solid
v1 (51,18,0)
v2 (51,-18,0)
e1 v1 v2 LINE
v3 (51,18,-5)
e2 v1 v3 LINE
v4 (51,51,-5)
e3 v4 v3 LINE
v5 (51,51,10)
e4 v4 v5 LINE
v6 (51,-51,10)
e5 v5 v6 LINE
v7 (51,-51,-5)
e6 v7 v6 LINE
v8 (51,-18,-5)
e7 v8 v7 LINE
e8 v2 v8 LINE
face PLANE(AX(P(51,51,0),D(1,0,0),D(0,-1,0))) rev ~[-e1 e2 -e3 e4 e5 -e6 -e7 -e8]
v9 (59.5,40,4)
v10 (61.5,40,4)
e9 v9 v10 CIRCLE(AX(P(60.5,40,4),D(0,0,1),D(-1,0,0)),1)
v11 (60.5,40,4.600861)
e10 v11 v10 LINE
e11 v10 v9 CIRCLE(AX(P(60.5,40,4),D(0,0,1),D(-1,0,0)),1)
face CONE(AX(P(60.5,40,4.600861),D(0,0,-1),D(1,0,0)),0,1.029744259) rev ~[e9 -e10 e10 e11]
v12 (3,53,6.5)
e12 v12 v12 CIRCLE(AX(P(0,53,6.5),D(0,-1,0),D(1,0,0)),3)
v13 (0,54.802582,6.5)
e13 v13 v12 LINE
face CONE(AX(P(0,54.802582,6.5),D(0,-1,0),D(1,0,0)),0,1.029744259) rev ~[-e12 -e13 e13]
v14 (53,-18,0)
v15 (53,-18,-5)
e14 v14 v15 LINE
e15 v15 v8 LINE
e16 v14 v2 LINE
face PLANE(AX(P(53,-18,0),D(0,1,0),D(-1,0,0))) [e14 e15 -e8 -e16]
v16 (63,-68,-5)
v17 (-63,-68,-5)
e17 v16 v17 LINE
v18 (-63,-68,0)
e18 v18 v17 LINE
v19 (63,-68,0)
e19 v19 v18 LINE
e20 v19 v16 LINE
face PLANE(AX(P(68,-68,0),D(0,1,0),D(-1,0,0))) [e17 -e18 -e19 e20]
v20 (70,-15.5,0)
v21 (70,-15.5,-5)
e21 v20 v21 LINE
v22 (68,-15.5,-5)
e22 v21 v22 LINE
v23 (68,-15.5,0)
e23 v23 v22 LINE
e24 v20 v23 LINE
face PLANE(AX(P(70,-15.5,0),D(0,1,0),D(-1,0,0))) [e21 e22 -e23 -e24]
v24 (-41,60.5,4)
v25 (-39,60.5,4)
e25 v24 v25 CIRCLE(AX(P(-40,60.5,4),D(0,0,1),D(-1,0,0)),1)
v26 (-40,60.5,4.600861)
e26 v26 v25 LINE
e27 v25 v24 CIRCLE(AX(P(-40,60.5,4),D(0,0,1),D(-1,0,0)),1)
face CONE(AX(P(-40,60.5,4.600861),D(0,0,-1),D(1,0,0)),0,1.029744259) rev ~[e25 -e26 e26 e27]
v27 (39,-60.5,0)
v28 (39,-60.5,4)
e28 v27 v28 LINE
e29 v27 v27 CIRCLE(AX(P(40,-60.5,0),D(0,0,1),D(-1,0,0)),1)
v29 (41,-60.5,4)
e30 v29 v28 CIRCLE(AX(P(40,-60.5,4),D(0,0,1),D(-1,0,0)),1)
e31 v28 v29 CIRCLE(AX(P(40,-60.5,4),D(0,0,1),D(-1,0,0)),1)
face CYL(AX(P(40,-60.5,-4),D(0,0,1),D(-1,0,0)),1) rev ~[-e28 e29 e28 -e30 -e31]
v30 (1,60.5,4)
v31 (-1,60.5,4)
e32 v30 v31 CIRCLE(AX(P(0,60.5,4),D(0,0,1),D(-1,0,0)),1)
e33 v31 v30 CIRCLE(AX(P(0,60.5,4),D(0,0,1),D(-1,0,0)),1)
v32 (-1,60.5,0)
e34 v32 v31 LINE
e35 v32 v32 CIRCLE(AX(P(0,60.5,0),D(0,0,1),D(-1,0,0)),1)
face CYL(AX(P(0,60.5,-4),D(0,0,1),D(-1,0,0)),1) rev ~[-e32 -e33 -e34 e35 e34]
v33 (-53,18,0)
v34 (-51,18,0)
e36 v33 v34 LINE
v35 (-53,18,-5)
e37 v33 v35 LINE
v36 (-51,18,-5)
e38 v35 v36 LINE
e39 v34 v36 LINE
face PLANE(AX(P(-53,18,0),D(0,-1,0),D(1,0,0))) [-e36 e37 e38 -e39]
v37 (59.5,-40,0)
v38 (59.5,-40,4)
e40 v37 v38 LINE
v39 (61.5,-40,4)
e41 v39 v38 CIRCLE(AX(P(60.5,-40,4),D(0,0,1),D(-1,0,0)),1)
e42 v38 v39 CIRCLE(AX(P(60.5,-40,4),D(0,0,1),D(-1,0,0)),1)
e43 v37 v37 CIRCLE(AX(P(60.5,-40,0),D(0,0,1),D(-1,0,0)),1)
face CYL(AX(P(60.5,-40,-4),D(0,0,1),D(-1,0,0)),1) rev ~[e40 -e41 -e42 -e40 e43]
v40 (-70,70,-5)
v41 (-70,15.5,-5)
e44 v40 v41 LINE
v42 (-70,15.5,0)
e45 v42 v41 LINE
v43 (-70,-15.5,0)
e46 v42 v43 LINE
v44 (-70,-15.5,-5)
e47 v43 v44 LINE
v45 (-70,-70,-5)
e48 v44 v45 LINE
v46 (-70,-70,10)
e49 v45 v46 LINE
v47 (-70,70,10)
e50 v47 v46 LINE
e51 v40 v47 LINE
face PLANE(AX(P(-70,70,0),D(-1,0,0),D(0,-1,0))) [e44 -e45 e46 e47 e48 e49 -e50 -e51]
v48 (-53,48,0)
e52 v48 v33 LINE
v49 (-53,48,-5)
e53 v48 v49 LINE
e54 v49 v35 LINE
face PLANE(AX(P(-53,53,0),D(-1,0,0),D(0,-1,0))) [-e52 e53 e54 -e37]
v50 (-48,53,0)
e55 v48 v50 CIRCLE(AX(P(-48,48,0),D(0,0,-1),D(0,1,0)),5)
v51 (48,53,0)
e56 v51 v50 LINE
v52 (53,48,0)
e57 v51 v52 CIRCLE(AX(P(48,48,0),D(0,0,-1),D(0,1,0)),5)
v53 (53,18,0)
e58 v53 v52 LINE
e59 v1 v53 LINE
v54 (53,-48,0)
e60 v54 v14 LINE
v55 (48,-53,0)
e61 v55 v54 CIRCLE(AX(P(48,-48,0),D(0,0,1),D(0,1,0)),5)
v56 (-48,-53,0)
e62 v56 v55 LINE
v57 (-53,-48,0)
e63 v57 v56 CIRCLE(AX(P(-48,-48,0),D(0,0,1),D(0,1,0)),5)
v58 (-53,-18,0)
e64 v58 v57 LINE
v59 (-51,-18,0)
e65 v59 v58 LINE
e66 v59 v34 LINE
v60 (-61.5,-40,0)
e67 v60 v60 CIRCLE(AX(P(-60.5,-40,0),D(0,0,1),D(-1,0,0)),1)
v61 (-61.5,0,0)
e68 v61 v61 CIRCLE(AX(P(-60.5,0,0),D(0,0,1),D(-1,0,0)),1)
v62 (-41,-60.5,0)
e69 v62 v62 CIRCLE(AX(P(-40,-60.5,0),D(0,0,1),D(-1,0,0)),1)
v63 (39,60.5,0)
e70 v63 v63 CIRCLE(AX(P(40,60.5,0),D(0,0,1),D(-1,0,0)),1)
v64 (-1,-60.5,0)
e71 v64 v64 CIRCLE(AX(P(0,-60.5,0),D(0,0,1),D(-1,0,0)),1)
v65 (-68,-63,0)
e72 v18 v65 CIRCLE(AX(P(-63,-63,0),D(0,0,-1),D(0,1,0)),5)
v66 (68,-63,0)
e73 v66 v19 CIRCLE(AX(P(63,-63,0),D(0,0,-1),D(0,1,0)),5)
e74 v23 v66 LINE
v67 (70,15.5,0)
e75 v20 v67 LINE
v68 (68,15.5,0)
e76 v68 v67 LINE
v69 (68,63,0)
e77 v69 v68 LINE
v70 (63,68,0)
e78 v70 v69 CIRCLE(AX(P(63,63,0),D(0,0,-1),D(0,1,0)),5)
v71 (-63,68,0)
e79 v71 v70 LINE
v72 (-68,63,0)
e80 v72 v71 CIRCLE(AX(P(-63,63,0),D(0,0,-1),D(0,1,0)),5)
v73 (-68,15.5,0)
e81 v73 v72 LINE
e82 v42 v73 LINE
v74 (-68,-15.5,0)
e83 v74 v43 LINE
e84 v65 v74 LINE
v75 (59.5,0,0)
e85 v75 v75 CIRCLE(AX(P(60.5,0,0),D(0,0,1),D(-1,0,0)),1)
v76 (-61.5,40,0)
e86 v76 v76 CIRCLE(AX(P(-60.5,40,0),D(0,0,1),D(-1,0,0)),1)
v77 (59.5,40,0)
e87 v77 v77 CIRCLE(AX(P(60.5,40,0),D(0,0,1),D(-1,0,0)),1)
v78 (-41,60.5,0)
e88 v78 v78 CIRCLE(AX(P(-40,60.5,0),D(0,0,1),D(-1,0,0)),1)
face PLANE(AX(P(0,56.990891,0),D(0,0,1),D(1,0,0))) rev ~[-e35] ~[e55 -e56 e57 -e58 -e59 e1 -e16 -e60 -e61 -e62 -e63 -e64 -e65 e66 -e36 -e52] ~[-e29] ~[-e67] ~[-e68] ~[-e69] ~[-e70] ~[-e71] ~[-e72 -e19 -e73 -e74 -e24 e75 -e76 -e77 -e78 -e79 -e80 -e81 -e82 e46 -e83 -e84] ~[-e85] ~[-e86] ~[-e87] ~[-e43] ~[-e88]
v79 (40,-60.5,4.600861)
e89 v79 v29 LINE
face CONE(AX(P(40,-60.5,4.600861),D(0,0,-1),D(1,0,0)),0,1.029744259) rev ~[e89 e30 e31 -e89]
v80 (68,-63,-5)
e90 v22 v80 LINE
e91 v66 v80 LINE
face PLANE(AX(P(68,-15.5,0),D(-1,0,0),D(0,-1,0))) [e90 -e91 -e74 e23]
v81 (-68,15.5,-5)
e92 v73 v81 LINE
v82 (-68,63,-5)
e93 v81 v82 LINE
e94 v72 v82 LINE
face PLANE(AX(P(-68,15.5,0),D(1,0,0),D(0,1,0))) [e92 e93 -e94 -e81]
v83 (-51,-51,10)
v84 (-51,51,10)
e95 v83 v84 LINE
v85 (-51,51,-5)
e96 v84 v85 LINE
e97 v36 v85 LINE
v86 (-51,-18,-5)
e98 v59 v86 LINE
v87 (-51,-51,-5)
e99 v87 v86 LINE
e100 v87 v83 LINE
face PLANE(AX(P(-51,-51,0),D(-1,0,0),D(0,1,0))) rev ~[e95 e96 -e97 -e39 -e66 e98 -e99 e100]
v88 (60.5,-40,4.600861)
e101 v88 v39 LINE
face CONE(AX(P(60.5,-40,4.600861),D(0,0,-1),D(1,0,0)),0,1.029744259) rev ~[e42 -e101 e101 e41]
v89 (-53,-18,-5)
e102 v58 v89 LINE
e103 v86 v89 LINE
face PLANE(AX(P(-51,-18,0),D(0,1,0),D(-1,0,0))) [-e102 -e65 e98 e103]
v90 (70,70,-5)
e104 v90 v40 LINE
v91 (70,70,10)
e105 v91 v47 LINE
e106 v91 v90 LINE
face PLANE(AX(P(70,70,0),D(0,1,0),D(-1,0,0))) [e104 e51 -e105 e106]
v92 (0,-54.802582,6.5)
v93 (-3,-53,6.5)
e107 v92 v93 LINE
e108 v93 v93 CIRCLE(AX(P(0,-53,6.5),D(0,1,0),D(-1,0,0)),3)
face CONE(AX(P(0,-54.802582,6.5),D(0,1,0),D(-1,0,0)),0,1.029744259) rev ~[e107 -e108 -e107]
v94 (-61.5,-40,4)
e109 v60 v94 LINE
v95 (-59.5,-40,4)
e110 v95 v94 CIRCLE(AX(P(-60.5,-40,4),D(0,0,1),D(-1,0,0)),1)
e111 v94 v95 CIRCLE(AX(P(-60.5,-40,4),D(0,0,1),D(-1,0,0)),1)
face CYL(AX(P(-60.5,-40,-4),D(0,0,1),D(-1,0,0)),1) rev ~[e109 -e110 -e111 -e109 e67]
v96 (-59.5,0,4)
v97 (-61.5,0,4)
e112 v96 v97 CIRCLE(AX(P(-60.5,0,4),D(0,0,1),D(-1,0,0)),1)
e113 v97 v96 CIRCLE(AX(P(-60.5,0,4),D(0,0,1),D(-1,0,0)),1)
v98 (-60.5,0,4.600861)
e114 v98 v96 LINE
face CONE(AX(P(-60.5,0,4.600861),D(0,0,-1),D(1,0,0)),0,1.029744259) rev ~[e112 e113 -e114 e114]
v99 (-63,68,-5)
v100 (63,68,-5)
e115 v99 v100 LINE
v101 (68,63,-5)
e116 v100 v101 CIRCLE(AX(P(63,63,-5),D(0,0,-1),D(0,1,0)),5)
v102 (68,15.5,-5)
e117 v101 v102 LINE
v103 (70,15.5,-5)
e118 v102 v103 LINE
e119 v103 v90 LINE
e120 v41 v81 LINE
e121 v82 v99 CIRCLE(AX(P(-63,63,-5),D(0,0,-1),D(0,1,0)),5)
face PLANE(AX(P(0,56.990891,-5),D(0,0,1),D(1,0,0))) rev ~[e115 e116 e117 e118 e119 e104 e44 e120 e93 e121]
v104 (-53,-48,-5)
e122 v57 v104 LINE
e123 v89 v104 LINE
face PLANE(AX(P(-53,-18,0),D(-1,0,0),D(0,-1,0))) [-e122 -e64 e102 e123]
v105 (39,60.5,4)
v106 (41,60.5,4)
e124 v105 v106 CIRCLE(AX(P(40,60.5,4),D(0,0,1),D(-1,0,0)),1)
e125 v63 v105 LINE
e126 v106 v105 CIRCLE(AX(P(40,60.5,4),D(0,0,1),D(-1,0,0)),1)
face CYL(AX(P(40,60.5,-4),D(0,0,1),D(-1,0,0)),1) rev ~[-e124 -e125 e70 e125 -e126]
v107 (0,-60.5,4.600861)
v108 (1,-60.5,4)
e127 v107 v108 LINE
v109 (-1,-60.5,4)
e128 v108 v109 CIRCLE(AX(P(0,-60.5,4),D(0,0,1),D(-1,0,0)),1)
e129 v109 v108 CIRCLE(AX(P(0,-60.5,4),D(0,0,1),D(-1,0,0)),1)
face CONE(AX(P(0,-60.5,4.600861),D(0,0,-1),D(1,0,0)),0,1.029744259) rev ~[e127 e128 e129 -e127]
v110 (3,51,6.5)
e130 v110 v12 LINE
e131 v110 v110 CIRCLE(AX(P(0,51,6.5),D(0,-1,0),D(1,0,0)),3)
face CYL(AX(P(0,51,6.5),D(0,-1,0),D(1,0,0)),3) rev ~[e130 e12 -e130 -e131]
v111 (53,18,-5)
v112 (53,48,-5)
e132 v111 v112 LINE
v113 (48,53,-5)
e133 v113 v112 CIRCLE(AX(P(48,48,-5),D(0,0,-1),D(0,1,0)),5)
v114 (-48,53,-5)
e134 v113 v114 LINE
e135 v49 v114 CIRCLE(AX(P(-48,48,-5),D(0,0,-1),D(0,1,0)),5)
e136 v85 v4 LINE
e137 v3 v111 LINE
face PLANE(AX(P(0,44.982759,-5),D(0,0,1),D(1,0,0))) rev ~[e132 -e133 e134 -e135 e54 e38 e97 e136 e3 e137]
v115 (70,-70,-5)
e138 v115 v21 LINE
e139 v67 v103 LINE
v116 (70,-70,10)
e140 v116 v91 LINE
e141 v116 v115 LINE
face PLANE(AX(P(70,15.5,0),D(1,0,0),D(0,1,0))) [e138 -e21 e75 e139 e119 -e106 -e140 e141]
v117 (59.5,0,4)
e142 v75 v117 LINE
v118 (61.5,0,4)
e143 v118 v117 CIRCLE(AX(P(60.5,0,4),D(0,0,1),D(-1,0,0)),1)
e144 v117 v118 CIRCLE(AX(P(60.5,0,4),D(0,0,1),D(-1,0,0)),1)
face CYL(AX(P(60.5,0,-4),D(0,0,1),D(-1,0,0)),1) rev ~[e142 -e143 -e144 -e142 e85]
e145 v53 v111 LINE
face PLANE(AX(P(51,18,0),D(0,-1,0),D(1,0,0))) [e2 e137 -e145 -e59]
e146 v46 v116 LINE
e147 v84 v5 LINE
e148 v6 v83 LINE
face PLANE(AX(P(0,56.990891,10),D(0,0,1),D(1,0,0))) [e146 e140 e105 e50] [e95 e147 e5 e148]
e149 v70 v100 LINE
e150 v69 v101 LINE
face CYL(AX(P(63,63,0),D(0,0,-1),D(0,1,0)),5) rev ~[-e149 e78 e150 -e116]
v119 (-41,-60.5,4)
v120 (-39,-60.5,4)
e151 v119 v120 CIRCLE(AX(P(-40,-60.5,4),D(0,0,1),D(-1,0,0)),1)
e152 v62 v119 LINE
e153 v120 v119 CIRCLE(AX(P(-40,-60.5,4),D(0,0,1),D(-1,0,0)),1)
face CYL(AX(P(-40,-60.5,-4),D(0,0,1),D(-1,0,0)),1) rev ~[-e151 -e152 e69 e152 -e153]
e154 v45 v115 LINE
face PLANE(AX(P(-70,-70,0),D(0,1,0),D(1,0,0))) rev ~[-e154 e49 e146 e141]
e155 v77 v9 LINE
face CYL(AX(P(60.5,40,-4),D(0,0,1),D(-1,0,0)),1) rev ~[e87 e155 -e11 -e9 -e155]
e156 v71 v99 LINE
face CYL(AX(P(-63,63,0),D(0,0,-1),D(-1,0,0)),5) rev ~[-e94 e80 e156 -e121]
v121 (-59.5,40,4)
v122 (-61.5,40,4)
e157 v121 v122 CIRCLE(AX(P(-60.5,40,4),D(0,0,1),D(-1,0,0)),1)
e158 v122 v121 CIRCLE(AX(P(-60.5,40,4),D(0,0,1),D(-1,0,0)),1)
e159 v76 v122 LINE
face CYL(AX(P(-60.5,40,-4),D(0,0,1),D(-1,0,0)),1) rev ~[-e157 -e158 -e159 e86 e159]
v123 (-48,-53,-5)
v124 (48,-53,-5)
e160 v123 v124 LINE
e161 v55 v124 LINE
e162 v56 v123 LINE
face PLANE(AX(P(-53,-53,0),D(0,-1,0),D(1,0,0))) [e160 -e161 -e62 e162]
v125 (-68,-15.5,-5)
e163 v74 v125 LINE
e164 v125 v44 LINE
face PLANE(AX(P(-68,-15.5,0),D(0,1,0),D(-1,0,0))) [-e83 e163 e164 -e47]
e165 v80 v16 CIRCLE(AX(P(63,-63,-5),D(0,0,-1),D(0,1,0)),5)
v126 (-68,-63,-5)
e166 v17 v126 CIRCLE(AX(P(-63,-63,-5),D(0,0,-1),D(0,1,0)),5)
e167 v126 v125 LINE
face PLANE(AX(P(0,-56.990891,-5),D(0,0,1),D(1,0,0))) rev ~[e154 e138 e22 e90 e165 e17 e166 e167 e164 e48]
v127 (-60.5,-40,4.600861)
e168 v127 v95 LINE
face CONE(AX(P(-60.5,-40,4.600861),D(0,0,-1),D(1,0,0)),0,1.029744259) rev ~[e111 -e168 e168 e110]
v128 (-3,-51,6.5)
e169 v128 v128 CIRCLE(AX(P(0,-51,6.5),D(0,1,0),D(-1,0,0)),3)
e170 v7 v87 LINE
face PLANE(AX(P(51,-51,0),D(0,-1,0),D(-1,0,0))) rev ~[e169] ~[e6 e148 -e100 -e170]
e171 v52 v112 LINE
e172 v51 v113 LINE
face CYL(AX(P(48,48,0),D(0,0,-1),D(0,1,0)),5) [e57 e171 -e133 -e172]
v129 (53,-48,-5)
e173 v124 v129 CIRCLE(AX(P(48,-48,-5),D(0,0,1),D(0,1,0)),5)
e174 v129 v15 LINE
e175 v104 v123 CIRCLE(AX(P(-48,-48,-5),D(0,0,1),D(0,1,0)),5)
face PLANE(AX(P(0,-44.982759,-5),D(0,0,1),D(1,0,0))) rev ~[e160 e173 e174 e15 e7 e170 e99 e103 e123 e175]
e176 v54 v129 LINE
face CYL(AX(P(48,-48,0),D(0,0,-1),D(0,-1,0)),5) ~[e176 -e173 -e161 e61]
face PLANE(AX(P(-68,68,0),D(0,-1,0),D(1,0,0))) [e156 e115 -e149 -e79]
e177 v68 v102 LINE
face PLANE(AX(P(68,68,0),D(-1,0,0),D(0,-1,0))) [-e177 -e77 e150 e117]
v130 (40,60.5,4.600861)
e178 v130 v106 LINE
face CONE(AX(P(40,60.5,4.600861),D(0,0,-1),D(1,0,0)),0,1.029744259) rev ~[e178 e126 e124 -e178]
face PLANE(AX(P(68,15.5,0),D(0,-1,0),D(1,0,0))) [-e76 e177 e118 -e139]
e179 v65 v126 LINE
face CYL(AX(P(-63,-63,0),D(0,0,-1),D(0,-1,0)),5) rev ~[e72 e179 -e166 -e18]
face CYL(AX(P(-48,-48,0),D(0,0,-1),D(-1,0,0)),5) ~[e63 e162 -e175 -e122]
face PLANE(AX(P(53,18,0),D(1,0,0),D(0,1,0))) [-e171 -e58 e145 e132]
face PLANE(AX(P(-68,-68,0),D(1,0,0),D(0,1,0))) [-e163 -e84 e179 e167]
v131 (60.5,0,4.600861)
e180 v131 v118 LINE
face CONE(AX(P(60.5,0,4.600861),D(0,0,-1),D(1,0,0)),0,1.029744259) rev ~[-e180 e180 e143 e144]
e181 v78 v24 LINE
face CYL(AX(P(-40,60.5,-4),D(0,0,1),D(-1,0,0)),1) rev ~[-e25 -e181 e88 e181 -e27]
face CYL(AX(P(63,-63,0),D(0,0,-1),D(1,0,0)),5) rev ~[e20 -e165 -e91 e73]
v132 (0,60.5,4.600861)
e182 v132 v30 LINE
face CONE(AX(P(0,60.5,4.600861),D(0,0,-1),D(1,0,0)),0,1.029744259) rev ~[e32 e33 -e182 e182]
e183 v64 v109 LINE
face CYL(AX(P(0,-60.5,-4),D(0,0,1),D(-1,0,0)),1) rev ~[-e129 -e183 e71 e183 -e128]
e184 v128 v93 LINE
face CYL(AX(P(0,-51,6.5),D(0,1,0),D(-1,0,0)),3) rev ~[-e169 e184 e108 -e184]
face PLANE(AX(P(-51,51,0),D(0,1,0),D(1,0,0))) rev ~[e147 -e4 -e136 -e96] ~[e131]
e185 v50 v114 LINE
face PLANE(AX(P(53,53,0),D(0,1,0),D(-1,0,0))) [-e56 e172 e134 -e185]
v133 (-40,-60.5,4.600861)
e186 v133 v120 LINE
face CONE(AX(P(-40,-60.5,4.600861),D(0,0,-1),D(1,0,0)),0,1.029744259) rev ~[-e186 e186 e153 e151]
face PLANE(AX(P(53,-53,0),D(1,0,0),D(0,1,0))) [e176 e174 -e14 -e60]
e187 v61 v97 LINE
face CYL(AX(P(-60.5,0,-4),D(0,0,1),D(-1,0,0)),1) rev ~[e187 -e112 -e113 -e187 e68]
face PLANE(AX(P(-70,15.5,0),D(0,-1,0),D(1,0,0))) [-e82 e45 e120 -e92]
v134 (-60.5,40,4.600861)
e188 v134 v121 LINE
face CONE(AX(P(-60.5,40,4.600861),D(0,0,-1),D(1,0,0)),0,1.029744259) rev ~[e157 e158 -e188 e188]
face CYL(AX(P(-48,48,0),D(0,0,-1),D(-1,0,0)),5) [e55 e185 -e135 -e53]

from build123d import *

# Parameters (mm, degrees)
F1_DEPTH = 10
F2_DEPTH = 5
F3_D     = 2
F3_DEPTH = 4
F3_TIP   = 0.600860619
F4_R     = 5
F6_D     = 6
F6_DEPTH = 2
F6_TIP   = 1.8025818571
F8_D     = 6
F8_DEPTH = 2
F8_TIP   = 1.8025818571


# Not quite as in the source:
# - a feature names something its author has since deleted; it is built from what else it names


with BuildPart() as f1:
    # F0 (on Top) → F1 (new body)
    with BuildSketch(Plane.XY):
        Polygon((70, 70), (-70, 70), (-70, 15.5), (-68, 15.5), (-68, 68), (68, 68), (68, 15.5), (70, 15.5), align=None)
        Polygon((-68, 68), (-68, 15.5), (-68, 0), (-68, -15.5), (-68, -68), (68, -68), (68, -15.5), (68, 0), (68, 15.5), (68, 68), align=None)
        Polygon((53, -18), (53, -53), (-53, -53), (-53, -18), (-53, 18), (-53, 53), (53, 53), (53, 18), (53, 0), align=None, mode=Mode.SUBTRACT)
        Polygon((-68, 15.5), (-70, 15.5), (-70, -15.5), (-68, -15.5), (-68, 0), align=None)
        Polygon((-68, -15.5), (-70, -15.5), (-70, -70), (70, -70), (70, -15.5), (68, -15.5), (68, -68), (-68, -68), align=None)
        Polygon((70, -15.5), (70, 15.5), (68, 15.5), (68, 0), (68, -15.5), align=None)
        Polygon((-53, 53), (-53, 18), (-51, 18), (-51, 51), (51, 51), (51, 18), (53, 18), (53, 53), align=None)
        Polygon((-53, 18), (-53, -18), (-51, -18), (-51, 0), (-51, 18), align=None)
        Polygon((51, -18), (53, -18), (53, 0), (53, 18), (51, 18), align=None)
        Polygon((-53, -53), (53, -53), (53, -18), (51, -18), (51, -51), (-51, -51), (-51, -18), (-53, -18), align=None)
    extrude(amount=F1_DEPTH)

    # F0 (on Top) → F2 (join)
    with BuildSketch(Plane.XY):
        Polygon((70, 70), (-70, 70), (-70, 15.5), (-68, 15.5), (-68, 68), (68, 68), (68, 15.5), (70, 15.5), align=None)
        Polygon((-68, -15.5), (-70, -15.5), (-70, -70), (70, -70), (70, -15.5), (68, -15.5), (68, -68), (-68, -68), align=None)
        Polygon((-53, -53), (53, -53), (53, -18), (51, -18), (51, -51), (-51, -51), (-51, -18), (-53, -18), align=None)
        Polygon((-53, 53), (-53, 18), (-51, 18), (-51, 51), (51, 51), (51, 18), (53, 18), (53, 53), align=None)
    extrude(amount=-F2_DEPTH)

    # F3
    with Locations(Plane(origin=(0, 0, 0), x_dir=(1, 0, 0), z_dir=(0, 0, -1))):
        with Locations((0, 60.5), (60.5, 0), (0, -60.5), (-60.5, 0), (-60.5, 40), (-40, 60.5), (40, 60.5), (60.5, 40), (60.5, -40), (40, -60.5), (-40, -60.5), (-60.5, -40)):
            Hole(F3_D / 2, depth=F3_DEPTH)
            with Locations((0, 0, -(F3_DEPTH + F3_TIP / 2))):  # 118° drill point
                Cone(0, F3_D / 2, F3_TIP, mode=Mode.SUBTRACT)

    # F4
    f4_edges = [f1.edges().sort_by_distance(p)[0] for p in [
        (-68, -68, -2.5),
        (-53, -53, -2.5),
        (-53, 53, -2.5),
        (53, 53, -2.5),
        (53, -53, -2.5),
        (68, 68, -2.5),
        (-68, 68, -2.5),
        (68, -68, -2.5),
    ]]
    fillet(f4_edges, radius=F4_R)

    # F6 (one way)
    with BuildSketch(Plane.XZ.offset(-51)):
        with Locations((0, 6.5)):
            Circle(F6_D / 2)
    extrude(amount=-F6_DEPTH, mode=Mode.SUBTRACT)
    with Locations(Plane.XZ.offset(-51)):
        with Locations((0, 6.5)):
            with Locations((0, 0, -(F6_DEPTH + F6_TIP / 2))):  # 118° drill point
                Cone(0, F6_D / 2, F6_TIP, mode=Mode.SUBTRACT)

    # F8 (one way)
    with BuildSketch(Plane(origin=(0, -51, 0), x_dir=(-1, 0, 0), z_dir=(0, 1, 0))):
        with Locations((0, 6.5)):
            Circle(F8_D / 2)
    extrude(amount=-F8_DEPTH, mode=Mode.SUBTRACT)
    with Locations(Plane(origin=(0, -51, 0), x_dir=(-1, 0, 0), z_dir=(0, 1, 0))):
        with Locations((0, 6.5)):
            with Locations((0, 0, -(F8_DEPTH + F8_TIP / 2))):  # 118° drill point
                Cone(0, F8_D / 2, F8_TIP, mode=Mode.SUBTRACT)


solid = f1.part
